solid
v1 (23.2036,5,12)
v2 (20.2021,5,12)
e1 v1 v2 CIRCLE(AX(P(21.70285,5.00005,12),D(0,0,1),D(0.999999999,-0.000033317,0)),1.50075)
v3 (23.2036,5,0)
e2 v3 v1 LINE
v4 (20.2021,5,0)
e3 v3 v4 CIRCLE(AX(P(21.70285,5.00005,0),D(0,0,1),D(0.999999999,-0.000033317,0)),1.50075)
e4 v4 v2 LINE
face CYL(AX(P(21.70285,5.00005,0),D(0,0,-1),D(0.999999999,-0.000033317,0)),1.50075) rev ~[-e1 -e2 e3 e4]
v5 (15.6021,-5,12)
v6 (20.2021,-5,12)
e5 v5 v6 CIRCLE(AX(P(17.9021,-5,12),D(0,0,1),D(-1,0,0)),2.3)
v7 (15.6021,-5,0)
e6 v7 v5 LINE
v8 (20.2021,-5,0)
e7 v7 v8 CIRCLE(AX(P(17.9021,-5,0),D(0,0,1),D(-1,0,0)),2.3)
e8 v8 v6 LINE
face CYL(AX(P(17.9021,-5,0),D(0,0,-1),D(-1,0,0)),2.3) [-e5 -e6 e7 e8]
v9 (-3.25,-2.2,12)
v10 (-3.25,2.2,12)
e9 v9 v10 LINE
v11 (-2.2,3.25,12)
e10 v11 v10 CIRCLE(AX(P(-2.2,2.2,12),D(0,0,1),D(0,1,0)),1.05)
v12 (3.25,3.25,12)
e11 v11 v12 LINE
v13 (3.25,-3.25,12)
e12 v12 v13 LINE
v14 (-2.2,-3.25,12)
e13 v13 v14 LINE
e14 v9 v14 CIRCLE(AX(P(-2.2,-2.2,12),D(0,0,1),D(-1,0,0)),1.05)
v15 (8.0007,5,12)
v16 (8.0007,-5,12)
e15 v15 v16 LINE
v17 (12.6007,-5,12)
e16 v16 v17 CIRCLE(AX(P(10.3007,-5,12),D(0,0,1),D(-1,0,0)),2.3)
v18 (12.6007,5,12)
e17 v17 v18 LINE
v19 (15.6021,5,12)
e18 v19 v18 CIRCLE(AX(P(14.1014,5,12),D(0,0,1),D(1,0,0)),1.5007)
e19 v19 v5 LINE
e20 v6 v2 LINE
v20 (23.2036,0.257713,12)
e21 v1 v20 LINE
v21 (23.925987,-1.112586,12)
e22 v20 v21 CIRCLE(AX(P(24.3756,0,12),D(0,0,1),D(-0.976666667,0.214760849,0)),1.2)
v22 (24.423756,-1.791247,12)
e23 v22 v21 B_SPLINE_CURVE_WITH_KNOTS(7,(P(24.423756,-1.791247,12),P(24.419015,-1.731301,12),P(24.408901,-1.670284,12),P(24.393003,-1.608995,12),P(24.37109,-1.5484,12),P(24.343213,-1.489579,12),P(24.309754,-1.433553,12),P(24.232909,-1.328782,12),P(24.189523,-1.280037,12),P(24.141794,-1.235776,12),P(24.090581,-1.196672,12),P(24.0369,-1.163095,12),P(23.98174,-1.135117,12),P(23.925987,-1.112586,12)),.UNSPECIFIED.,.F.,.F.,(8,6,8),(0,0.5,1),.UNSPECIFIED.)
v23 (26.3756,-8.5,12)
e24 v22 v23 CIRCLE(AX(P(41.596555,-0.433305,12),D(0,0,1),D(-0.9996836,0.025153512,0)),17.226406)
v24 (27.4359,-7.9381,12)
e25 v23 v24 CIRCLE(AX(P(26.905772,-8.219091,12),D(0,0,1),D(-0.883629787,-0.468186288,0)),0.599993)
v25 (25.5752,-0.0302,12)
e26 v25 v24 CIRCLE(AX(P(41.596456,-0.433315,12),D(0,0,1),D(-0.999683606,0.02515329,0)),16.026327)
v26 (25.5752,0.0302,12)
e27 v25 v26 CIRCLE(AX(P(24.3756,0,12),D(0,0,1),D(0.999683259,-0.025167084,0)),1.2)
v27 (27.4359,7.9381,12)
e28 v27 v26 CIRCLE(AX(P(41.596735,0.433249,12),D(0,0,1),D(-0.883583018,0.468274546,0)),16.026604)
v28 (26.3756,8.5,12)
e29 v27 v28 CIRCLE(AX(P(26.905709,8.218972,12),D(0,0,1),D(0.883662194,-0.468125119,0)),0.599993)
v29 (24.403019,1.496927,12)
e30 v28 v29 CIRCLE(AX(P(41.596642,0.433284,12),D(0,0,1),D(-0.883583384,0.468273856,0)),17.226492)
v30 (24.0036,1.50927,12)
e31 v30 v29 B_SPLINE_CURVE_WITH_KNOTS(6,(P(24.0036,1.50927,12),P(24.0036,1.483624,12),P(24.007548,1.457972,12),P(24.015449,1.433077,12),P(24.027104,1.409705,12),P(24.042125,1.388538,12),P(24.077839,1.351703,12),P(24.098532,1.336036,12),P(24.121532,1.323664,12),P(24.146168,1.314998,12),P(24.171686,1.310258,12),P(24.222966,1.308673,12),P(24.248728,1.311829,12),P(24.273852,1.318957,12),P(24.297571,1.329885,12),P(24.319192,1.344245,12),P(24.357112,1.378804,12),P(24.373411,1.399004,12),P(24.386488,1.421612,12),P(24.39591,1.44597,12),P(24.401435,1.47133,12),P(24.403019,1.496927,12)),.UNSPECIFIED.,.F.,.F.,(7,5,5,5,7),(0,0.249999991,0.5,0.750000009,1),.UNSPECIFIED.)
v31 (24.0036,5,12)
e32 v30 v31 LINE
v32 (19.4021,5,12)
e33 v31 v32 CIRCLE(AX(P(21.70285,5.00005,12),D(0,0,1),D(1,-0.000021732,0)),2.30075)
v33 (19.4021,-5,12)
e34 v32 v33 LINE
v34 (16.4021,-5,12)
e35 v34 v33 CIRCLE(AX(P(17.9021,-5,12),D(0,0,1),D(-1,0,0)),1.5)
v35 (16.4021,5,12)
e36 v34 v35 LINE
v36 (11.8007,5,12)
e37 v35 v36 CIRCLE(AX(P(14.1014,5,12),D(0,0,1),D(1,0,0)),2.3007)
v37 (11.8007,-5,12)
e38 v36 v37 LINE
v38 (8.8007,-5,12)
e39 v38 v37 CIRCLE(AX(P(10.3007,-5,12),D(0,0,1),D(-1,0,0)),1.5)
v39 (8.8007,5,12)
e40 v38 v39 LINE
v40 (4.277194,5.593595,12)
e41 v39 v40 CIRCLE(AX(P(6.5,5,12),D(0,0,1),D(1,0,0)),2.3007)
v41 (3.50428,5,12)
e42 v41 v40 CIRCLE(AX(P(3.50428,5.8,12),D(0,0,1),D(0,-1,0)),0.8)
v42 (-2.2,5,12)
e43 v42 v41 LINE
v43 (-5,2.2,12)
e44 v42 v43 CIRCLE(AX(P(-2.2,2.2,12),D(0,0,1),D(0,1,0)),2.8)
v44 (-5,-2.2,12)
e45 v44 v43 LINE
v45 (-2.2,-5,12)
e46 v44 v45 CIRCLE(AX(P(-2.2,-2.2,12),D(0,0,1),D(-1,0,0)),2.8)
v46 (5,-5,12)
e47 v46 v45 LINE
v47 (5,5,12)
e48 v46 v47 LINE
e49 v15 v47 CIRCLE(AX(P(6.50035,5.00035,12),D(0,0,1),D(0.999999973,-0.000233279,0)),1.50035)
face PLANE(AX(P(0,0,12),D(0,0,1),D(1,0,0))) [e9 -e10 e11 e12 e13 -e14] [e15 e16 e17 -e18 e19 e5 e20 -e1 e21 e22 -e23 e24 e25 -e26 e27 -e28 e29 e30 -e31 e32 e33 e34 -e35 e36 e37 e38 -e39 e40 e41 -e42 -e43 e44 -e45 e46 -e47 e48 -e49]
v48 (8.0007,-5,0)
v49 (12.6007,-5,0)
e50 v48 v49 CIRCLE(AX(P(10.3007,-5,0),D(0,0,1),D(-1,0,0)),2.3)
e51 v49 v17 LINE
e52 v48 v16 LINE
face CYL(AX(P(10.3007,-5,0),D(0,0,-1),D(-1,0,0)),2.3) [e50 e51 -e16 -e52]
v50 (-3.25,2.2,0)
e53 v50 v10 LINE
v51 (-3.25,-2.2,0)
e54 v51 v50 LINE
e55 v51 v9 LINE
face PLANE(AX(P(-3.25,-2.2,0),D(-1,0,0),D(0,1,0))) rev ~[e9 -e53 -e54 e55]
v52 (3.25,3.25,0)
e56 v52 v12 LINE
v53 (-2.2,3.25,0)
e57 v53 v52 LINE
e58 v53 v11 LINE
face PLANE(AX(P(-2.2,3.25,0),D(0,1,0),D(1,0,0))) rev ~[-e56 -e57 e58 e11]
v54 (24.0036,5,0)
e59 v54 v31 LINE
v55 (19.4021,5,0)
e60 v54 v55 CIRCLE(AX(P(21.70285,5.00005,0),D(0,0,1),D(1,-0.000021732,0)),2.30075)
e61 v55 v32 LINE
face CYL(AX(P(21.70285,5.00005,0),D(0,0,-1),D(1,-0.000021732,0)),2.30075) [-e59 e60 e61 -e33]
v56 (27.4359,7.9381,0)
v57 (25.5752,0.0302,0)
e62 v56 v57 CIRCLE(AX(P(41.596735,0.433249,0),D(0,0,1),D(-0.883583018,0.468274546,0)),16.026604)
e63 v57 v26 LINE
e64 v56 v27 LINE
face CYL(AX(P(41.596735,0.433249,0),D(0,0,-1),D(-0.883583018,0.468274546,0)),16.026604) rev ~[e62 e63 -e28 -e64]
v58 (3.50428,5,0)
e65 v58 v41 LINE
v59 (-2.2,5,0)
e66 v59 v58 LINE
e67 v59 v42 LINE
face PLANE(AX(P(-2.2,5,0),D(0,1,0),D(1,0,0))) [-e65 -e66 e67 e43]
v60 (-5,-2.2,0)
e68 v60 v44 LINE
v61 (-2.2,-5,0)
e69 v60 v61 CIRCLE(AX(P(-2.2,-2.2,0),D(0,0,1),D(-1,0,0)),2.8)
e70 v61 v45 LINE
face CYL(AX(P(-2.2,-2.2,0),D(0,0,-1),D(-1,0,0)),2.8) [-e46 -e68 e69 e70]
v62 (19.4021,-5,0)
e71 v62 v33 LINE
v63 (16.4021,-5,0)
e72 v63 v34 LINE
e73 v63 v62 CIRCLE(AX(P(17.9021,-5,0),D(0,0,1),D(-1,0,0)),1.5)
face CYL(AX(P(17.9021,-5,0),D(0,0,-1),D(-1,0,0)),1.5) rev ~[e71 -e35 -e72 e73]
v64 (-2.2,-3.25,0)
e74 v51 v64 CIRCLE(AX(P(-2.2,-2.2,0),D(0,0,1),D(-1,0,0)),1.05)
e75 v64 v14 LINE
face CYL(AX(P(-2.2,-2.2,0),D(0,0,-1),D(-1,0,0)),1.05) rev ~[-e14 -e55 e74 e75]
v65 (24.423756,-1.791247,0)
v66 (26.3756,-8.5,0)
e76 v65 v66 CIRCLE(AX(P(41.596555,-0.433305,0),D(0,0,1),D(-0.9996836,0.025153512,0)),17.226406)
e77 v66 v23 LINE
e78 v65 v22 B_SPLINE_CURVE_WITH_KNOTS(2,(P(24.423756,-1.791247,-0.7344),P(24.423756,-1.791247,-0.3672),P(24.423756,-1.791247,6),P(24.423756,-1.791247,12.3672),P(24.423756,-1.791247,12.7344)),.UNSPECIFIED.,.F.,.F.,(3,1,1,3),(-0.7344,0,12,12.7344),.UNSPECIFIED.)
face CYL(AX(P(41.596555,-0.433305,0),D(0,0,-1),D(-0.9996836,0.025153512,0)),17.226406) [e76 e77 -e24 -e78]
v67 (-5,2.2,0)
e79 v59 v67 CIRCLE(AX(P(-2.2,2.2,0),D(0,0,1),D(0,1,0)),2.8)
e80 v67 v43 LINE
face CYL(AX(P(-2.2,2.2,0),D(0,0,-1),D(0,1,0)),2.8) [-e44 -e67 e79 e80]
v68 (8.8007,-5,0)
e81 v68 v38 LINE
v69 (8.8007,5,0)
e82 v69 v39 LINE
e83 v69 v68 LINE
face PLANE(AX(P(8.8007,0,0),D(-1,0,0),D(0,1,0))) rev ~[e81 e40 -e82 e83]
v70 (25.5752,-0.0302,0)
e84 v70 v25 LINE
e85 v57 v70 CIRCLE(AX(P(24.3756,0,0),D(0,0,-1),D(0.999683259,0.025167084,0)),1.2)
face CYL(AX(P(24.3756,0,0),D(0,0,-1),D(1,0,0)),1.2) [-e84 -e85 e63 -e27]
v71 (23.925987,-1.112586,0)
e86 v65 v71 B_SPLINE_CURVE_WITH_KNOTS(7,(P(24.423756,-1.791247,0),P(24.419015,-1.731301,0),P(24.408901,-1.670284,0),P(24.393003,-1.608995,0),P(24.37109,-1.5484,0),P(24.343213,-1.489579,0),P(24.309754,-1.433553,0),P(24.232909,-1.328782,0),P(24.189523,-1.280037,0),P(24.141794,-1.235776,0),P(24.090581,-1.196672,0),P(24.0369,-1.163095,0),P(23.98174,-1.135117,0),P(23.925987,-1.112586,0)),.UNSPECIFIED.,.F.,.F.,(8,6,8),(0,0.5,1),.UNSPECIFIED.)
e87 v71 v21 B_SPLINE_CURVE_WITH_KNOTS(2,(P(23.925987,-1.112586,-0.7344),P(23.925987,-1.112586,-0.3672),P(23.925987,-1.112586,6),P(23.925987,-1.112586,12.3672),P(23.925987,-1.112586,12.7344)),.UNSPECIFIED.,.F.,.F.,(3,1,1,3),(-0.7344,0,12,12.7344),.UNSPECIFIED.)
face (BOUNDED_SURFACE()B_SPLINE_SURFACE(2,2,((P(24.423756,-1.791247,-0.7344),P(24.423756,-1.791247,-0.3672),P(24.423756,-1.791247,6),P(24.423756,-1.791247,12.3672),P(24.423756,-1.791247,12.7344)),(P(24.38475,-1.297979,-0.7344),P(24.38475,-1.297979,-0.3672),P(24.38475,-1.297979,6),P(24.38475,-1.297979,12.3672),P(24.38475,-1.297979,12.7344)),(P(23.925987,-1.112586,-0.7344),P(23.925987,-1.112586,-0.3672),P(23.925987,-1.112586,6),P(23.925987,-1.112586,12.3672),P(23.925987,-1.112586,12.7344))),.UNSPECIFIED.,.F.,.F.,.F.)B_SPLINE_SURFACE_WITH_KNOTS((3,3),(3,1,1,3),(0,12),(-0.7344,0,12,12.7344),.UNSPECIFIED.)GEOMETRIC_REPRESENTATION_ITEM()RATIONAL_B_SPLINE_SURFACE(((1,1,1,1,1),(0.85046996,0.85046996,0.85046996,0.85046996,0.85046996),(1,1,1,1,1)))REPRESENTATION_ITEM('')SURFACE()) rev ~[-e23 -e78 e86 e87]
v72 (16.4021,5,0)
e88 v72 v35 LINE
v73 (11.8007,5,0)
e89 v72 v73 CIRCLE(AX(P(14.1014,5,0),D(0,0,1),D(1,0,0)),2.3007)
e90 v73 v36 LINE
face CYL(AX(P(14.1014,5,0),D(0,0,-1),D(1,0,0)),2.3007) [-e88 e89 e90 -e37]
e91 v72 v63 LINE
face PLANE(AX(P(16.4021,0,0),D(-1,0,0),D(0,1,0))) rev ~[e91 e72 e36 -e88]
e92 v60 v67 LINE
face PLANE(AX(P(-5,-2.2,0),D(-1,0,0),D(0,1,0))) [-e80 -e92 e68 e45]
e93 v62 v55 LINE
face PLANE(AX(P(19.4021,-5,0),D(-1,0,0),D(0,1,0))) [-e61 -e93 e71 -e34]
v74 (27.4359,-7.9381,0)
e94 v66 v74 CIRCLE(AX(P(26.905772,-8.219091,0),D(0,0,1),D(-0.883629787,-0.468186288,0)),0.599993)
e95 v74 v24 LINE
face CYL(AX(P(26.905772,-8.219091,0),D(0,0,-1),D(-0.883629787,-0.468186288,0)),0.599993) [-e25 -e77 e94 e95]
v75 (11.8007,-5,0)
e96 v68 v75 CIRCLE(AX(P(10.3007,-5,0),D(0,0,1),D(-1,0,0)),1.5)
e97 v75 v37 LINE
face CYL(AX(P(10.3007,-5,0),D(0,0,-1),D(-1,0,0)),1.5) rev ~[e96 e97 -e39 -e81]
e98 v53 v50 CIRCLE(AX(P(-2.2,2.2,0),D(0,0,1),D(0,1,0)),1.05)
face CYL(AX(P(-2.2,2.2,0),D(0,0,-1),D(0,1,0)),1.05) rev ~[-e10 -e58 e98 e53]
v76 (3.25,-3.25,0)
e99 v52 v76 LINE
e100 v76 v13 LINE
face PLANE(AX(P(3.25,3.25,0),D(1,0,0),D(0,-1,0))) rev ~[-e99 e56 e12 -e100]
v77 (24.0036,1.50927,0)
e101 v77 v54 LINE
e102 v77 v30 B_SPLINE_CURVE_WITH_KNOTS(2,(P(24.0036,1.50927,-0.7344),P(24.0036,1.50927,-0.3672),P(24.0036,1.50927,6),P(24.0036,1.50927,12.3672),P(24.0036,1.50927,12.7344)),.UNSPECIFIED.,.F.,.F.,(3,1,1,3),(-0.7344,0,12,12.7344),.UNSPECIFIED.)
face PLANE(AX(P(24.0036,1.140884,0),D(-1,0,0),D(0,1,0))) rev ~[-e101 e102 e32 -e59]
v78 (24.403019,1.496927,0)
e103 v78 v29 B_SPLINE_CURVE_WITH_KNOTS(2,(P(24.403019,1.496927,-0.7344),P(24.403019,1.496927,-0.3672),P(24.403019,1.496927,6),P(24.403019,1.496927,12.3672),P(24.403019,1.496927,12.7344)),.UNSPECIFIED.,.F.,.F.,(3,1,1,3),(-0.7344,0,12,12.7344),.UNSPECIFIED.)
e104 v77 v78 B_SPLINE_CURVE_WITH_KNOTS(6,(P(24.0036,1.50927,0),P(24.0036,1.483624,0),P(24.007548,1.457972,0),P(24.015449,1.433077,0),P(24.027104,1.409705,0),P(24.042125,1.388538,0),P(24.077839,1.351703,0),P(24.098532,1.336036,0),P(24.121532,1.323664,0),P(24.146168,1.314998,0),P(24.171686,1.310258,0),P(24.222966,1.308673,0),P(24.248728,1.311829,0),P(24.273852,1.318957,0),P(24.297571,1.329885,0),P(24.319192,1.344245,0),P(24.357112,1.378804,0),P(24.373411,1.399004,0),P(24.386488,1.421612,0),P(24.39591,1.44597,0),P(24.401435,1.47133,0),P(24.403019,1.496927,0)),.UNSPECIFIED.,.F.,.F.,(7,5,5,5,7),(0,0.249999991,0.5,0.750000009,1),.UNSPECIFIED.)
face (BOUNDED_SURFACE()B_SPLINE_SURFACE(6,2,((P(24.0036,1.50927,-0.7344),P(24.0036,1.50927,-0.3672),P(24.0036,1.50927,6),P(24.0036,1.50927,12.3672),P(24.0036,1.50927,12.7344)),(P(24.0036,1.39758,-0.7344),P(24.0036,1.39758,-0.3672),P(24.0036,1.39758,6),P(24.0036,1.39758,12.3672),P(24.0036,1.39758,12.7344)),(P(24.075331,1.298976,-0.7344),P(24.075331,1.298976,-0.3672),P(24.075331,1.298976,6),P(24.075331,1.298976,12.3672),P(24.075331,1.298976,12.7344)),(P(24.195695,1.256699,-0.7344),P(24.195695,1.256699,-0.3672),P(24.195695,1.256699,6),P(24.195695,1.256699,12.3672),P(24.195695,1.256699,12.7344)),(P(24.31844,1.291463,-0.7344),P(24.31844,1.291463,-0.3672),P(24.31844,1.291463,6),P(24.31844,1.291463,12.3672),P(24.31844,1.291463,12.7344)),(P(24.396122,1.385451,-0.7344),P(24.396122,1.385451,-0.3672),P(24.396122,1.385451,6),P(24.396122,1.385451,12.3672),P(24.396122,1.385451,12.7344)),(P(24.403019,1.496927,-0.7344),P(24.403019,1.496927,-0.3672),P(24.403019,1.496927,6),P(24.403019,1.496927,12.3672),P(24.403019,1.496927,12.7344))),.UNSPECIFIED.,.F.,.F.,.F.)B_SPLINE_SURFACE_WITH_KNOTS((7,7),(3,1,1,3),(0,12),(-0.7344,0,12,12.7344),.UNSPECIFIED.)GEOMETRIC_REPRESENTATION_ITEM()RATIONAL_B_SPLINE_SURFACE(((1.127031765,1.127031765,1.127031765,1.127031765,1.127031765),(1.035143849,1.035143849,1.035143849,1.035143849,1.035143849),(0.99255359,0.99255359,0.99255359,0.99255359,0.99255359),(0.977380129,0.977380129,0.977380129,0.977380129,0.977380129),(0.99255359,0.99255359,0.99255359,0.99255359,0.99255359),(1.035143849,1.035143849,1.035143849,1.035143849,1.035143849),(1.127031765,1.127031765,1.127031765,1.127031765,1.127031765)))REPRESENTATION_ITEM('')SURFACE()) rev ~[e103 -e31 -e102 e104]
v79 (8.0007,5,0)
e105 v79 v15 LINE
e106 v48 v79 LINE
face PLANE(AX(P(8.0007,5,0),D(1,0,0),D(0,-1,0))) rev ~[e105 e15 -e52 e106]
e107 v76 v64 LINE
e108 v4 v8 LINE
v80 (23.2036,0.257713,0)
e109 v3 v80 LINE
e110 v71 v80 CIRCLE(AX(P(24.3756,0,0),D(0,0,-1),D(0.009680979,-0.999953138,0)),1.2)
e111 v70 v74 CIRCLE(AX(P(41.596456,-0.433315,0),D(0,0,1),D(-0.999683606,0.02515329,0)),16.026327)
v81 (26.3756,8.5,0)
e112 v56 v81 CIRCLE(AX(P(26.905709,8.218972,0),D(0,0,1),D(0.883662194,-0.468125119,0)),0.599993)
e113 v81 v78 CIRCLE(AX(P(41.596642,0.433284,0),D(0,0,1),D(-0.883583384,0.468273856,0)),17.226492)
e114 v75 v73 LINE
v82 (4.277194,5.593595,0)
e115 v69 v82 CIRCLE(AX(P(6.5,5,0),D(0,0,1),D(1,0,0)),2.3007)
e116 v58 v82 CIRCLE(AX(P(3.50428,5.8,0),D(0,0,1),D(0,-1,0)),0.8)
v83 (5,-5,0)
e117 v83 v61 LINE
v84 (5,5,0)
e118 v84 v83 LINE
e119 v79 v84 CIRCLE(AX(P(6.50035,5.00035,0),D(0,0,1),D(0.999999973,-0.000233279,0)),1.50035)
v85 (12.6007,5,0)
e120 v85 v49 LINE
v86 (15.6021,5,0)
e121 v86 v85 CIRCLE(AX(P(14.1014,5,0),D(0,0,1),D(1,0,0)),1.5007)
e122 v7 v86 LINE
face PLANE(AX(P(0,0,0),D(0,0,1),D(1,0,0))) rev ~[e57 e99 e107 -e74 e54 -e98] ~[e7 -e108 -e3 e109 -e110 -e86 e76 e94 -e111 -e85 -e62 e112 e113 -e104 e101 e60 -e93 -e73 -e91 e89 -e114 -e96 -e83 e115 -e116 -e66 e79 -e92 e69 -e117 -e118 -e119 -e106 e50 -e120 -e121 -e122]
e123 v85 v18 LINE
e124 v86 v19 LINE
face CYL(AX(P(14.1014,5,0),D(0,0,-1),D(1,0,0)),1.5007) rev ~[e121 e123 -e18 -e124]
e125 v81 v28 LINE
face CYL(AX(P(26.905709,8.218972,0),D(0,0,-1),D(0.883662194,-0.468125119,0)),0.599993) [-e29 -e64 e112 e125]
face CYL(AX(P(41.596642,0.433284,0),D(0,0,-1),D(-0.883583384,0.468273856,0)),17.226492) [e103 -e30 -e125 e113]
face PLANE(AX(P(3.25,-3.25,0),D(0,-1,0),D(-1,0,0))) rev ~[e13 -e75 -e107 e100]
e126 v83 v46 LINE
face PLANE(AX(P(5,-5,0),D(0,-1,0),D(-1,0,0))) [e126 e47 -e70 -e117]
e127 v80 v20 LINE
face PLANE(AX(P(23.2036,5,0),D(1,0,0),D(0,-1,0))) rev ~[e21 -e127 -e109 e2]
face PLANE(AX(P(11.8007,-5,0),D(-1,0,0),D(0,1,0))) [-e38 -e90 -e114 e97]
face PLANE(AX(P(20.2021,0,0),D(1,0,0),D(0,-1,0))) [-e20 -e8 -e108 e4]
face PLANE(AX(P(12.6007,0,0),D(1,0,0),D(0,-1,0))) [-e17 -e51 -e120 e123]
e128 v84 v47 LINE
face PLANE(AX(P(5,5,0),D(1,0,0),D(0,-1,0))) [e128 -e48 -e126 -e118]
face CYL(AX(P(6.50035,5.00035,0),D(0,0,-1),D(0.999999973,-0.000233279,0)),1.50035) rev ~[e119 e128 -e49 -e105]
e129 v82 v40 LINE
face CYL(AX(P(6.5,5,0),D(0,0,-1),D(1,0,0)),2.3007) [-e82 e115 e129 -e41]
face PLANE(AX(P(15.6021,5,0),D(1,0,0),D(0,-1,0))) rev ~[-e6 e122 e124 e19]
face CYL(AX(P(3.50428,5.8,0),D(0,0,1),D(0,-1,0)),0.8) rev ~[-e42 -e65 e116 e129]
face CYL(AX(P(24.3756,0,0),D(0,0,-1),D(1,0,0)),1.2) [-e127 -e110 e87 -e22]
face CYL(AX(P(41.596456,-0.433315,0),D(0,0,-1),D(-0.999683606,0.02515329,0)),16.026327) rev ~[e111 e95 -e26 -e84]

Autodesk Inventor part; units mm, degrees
ref_plane "YZ Plane" through (0, 0, 0) normal (1, 0, 0) x (0, 1, 0)
ref_plane "XZ Plane" through (0, 0, 0) normal (0, 1, 0) x (-1, 0, 0)
ref_plane "XY Plane" through (0, 0, 0) normal (0, 0, 1) x (1, 0, 0)
sketch "Boceto1" plane through (0, 0, 0) normal (0, 0, 1) x (1, 0, 0)
  line L0 (3, -11.4) -> (3, -5.5)
  line L1 (3, -5.5) -> (-2.2, -5.5)
  arc A0 (-5.5, -2.2) -> (-2.2, -5.5) centre (-2.2, -2.2) ccw
  line L2 (-5.5, -2.2) -> (-5.5, 2.2)
  arc A1 (-2.2, 5.5) -> (-5.5, 2.2) centre (-2.2, 2.2) ccw
  line L3 (-2.2, 5.5) -> (3, 5.5)
  line L4 (3, 5.5) -> (3, 11.4)
  line L5 (3, 3) -> (-2.2, 3)
  arc A2 (-2.2, 3) -> (-3, 2.2) centre (-2.2, 2.2) ccw
  line L6 (-3, 2.2) -> (-3, -2.2)
  arc A3 (-3, -2.2) -> (-2.2, -3) centre (-2.2, -2.2) ccw
  line L7 (-2.2, -3) -> (3, -3)
  line L8 (3, -3) -> (3, 3)
  line L9 (-2.2, 3.25) -> (3.25, 3.25)
  line L10 (3.25, 3.25) -> (3.25, -3.25)
  line L11 (3.25, -3.25) -> (-2.2, -3.25)
  arc A4 (-3.25, -2.2) -> (-2.2, -3.25) centre (-2.2, -2.2) ccw
  line L12 (-3.25, -2.2) -> (-3.25, 2.2)
  arc A5 (-2.2, 3.25) -> (-3.25, 2.2) centre (-2.2, 2.2) ccw
  line L13 (-2.2, 5) -> (5, 5)
  line L14 (5, 5) -> (5, -5)
  line L15 (5, -5) -> (-2.2, -5)
  arc A6 (-5, -2.2) -> (-2.2, -5) centre (-2.2, -2.2) ccw
  line L16 (-5, -2.2) -> (-5, 2.2)
  arc A7 (-2.2, 5) -> (-5, 2.2) centre (-2.2, 2.2) ccw
  line L17 (5, 0) -> (23, 0)
  line L18 (5, 5) -> (6.5, 5)
  line L19 (8.8007, 5) -> (8.0007, 5)
  line L20 (8.0007, 5) -> (8.0007, -5)
  line L21 (8.0007, -5) -> (8.8007, -5)
  line L22 (8.8007, -5) -> (8.8007, 5)
  line L23 (8.8007, -5) -> (10.3007, -5)
  line L24 (12.6007, -5) -> (11.8007, -5)
  line L25 (11.8007, -5) -> (11.8007, 5)
  line L26 (11.8007, 5) -> (12.6007, 5)
  line L27 (12.6007, 5) -> (12.6007, -5)
  arc A8 (8.8007, -5) -> (11.8007, -5) centre (10.3007, -5) ccw
  arc A9 (8.0007, -5) -> (12.6007, -5) centre (10.3007, -5) ccw
  arc A10 (8.0007, 5) -> (4.9993, 5) centre (6.5, 5) ccw
  arc A11 (8.8007, 5) -> (4.1993, 5) centre (6.5, 5) ccw
  line L28 (16.4021, 5) -> (15.6021, 5)
  line L29 (15.6021, 5) -> (15.6021, -5)
  line L30 (15.6021, -5) -> (16.4021, -5)
  line L31 (16.4021, -5) -> (16.4021, 5)
  line L32 (20.2021, -5) -> (19.4021, -5)
  line L33 (19.4021, -5) -> (19.4021, 5)
  line L34 (19.4021, 5) -> (20.2021, 5)
  line L35 (20.2021, 5) -> (20.2021, -5)
  arc A12 (16.4021, -5) -> (19.4021, -5) centre (17.9021, -5) ccw
  arc A13 (15.6021, -5) -> (20.2021, -5) centre (17.9021, -5) ccw
  arc A14 (15.6021, 5) -> (12.6007, 5) centre (14.1014, 5) ccw
  arc A15 (16.4021, 5) -> (11.8007, 5) centre (14.1014, 5) ccw
  line L36 (24.0036, 5) -> (23.2036, 5)
  line L37 (23.2036, 5) -> (23.2036, -0.2574)
  line L38 (23.2036, -5) -> (24.0036, -5)
  line L39 (24.0036, -1.1409) -> (24.0036, 5)
  arc A16 (23.2036, 5) -> (20.2021, 5) centre (21.7028, 5) ccw
  arc A17 (24.0036, 5) -> (19.4021, 5) centre (21.7028, 5) ccw
  arc A18 (26.3756, 8.5) -> (24.3756, 0) centre (41.5966, 0.4333) ccw
  circle A19 centre (24.3756, 0) radius 1.2
  arc A20 (27.4359, 7.9381) -> (25.5752, 0.0302) centre (41.5966, 0.4333) ccw
  line L40 (25.6, 8.5) -> (25.9736, 8.302)
  arc A21 (27.4359, 7.9381) -> (26.3756, 8.5) centre (26.9058, 8.219) ccw
  arc A22 (24.3756, 0) -> (26.3756, -8.5) centre (41.5966, -0.4333) ccw
  arc A23 (26.3756, -8.5) -> (27.4359, -7.9381) centre (26.9058, -8.219) ccw
  line L41 (26.7492, -8.302) -> (27.4359, -7.9381)
  arc A24 (25.5752, -0.0302) -> (27.4359, -7.9381) centre (41.5966, -0.4333) ccw
  line L42 (23.2036, 0) -> (24.0036, 0)
  point P0 (0, 0)
  point P1 (5, -5)
  point P2 (4.2, -5)
  point P3 (3.8, 5)
  point P4 (25.5036, -5)
  point P5 (22.4, 0)
  point P6 (24.3872, 1.1999)
  point P7 (24.0036, 1.1409)
  point P8 (23.2036, 0.2574)
  point P9 (24.3872, -1.1999)
  point P10 (25.5752, -0.0302)
  point P11 (25.5752, 0.0302)
  dimension "d1" = 0.25
  dimension "d2" = 2
  dimension "d42" = 18
  dimension "d43" = 1.5
  dimension "d45" = 0.8
  dimension "d46" = 10
  dimension "d47" = 1.5
  dimension "d48" = 0.8
  dimension "d49" = 10
  dimension "d50" = 0.8
  dimension "d51" = 10
  dimension "d52" = 1.5
  dimension "d53" = 0.8
  dimension "d54" = 10
  dimension "d55" = 0.8
  dimension "d56" = 10
  dimension "d57" = 1.5
  dimension "d62" = 1.2
extrude "Extrusión1" add sketch "Boceto1" along normal blind 12 contours L13 L14 L15 A6 L16 A7 | A11 L19 A10 L13 | L22 L17 L20 L19 | L22 L21 L20 L17 | L25 L26 L27 L17 | L17 L27 L24 L25 | A8 L24 A9 L21 | A15 L28 A14 L26 | L29 L28 L31 L17 | L17 L31 L30 L29 | L30 A12 L32 A13 | L33 L34 L35 L17 | L17 L35 L32 L33 | A17 L36 A16 L34 | L39 A19 L37 L36 | A19 A18 A22 L39 | L39 L42 L37 A19 | L37 A19 | L39 A19 L37 L42 | A19 A22 A18 | A18 A21 A20 A19 | A19 A24 A23 A22
fillet "Empalme1" radius 0.8 2 edges at (4.1993, 5, 6) (24.3872, -1.1999, 6)
fillet "Empalme1" radius 0.2 2 edges at (24.0036, 1.1409, 6) (24.3872, 1.1999, 6)
properties part number "_3DPrint"
